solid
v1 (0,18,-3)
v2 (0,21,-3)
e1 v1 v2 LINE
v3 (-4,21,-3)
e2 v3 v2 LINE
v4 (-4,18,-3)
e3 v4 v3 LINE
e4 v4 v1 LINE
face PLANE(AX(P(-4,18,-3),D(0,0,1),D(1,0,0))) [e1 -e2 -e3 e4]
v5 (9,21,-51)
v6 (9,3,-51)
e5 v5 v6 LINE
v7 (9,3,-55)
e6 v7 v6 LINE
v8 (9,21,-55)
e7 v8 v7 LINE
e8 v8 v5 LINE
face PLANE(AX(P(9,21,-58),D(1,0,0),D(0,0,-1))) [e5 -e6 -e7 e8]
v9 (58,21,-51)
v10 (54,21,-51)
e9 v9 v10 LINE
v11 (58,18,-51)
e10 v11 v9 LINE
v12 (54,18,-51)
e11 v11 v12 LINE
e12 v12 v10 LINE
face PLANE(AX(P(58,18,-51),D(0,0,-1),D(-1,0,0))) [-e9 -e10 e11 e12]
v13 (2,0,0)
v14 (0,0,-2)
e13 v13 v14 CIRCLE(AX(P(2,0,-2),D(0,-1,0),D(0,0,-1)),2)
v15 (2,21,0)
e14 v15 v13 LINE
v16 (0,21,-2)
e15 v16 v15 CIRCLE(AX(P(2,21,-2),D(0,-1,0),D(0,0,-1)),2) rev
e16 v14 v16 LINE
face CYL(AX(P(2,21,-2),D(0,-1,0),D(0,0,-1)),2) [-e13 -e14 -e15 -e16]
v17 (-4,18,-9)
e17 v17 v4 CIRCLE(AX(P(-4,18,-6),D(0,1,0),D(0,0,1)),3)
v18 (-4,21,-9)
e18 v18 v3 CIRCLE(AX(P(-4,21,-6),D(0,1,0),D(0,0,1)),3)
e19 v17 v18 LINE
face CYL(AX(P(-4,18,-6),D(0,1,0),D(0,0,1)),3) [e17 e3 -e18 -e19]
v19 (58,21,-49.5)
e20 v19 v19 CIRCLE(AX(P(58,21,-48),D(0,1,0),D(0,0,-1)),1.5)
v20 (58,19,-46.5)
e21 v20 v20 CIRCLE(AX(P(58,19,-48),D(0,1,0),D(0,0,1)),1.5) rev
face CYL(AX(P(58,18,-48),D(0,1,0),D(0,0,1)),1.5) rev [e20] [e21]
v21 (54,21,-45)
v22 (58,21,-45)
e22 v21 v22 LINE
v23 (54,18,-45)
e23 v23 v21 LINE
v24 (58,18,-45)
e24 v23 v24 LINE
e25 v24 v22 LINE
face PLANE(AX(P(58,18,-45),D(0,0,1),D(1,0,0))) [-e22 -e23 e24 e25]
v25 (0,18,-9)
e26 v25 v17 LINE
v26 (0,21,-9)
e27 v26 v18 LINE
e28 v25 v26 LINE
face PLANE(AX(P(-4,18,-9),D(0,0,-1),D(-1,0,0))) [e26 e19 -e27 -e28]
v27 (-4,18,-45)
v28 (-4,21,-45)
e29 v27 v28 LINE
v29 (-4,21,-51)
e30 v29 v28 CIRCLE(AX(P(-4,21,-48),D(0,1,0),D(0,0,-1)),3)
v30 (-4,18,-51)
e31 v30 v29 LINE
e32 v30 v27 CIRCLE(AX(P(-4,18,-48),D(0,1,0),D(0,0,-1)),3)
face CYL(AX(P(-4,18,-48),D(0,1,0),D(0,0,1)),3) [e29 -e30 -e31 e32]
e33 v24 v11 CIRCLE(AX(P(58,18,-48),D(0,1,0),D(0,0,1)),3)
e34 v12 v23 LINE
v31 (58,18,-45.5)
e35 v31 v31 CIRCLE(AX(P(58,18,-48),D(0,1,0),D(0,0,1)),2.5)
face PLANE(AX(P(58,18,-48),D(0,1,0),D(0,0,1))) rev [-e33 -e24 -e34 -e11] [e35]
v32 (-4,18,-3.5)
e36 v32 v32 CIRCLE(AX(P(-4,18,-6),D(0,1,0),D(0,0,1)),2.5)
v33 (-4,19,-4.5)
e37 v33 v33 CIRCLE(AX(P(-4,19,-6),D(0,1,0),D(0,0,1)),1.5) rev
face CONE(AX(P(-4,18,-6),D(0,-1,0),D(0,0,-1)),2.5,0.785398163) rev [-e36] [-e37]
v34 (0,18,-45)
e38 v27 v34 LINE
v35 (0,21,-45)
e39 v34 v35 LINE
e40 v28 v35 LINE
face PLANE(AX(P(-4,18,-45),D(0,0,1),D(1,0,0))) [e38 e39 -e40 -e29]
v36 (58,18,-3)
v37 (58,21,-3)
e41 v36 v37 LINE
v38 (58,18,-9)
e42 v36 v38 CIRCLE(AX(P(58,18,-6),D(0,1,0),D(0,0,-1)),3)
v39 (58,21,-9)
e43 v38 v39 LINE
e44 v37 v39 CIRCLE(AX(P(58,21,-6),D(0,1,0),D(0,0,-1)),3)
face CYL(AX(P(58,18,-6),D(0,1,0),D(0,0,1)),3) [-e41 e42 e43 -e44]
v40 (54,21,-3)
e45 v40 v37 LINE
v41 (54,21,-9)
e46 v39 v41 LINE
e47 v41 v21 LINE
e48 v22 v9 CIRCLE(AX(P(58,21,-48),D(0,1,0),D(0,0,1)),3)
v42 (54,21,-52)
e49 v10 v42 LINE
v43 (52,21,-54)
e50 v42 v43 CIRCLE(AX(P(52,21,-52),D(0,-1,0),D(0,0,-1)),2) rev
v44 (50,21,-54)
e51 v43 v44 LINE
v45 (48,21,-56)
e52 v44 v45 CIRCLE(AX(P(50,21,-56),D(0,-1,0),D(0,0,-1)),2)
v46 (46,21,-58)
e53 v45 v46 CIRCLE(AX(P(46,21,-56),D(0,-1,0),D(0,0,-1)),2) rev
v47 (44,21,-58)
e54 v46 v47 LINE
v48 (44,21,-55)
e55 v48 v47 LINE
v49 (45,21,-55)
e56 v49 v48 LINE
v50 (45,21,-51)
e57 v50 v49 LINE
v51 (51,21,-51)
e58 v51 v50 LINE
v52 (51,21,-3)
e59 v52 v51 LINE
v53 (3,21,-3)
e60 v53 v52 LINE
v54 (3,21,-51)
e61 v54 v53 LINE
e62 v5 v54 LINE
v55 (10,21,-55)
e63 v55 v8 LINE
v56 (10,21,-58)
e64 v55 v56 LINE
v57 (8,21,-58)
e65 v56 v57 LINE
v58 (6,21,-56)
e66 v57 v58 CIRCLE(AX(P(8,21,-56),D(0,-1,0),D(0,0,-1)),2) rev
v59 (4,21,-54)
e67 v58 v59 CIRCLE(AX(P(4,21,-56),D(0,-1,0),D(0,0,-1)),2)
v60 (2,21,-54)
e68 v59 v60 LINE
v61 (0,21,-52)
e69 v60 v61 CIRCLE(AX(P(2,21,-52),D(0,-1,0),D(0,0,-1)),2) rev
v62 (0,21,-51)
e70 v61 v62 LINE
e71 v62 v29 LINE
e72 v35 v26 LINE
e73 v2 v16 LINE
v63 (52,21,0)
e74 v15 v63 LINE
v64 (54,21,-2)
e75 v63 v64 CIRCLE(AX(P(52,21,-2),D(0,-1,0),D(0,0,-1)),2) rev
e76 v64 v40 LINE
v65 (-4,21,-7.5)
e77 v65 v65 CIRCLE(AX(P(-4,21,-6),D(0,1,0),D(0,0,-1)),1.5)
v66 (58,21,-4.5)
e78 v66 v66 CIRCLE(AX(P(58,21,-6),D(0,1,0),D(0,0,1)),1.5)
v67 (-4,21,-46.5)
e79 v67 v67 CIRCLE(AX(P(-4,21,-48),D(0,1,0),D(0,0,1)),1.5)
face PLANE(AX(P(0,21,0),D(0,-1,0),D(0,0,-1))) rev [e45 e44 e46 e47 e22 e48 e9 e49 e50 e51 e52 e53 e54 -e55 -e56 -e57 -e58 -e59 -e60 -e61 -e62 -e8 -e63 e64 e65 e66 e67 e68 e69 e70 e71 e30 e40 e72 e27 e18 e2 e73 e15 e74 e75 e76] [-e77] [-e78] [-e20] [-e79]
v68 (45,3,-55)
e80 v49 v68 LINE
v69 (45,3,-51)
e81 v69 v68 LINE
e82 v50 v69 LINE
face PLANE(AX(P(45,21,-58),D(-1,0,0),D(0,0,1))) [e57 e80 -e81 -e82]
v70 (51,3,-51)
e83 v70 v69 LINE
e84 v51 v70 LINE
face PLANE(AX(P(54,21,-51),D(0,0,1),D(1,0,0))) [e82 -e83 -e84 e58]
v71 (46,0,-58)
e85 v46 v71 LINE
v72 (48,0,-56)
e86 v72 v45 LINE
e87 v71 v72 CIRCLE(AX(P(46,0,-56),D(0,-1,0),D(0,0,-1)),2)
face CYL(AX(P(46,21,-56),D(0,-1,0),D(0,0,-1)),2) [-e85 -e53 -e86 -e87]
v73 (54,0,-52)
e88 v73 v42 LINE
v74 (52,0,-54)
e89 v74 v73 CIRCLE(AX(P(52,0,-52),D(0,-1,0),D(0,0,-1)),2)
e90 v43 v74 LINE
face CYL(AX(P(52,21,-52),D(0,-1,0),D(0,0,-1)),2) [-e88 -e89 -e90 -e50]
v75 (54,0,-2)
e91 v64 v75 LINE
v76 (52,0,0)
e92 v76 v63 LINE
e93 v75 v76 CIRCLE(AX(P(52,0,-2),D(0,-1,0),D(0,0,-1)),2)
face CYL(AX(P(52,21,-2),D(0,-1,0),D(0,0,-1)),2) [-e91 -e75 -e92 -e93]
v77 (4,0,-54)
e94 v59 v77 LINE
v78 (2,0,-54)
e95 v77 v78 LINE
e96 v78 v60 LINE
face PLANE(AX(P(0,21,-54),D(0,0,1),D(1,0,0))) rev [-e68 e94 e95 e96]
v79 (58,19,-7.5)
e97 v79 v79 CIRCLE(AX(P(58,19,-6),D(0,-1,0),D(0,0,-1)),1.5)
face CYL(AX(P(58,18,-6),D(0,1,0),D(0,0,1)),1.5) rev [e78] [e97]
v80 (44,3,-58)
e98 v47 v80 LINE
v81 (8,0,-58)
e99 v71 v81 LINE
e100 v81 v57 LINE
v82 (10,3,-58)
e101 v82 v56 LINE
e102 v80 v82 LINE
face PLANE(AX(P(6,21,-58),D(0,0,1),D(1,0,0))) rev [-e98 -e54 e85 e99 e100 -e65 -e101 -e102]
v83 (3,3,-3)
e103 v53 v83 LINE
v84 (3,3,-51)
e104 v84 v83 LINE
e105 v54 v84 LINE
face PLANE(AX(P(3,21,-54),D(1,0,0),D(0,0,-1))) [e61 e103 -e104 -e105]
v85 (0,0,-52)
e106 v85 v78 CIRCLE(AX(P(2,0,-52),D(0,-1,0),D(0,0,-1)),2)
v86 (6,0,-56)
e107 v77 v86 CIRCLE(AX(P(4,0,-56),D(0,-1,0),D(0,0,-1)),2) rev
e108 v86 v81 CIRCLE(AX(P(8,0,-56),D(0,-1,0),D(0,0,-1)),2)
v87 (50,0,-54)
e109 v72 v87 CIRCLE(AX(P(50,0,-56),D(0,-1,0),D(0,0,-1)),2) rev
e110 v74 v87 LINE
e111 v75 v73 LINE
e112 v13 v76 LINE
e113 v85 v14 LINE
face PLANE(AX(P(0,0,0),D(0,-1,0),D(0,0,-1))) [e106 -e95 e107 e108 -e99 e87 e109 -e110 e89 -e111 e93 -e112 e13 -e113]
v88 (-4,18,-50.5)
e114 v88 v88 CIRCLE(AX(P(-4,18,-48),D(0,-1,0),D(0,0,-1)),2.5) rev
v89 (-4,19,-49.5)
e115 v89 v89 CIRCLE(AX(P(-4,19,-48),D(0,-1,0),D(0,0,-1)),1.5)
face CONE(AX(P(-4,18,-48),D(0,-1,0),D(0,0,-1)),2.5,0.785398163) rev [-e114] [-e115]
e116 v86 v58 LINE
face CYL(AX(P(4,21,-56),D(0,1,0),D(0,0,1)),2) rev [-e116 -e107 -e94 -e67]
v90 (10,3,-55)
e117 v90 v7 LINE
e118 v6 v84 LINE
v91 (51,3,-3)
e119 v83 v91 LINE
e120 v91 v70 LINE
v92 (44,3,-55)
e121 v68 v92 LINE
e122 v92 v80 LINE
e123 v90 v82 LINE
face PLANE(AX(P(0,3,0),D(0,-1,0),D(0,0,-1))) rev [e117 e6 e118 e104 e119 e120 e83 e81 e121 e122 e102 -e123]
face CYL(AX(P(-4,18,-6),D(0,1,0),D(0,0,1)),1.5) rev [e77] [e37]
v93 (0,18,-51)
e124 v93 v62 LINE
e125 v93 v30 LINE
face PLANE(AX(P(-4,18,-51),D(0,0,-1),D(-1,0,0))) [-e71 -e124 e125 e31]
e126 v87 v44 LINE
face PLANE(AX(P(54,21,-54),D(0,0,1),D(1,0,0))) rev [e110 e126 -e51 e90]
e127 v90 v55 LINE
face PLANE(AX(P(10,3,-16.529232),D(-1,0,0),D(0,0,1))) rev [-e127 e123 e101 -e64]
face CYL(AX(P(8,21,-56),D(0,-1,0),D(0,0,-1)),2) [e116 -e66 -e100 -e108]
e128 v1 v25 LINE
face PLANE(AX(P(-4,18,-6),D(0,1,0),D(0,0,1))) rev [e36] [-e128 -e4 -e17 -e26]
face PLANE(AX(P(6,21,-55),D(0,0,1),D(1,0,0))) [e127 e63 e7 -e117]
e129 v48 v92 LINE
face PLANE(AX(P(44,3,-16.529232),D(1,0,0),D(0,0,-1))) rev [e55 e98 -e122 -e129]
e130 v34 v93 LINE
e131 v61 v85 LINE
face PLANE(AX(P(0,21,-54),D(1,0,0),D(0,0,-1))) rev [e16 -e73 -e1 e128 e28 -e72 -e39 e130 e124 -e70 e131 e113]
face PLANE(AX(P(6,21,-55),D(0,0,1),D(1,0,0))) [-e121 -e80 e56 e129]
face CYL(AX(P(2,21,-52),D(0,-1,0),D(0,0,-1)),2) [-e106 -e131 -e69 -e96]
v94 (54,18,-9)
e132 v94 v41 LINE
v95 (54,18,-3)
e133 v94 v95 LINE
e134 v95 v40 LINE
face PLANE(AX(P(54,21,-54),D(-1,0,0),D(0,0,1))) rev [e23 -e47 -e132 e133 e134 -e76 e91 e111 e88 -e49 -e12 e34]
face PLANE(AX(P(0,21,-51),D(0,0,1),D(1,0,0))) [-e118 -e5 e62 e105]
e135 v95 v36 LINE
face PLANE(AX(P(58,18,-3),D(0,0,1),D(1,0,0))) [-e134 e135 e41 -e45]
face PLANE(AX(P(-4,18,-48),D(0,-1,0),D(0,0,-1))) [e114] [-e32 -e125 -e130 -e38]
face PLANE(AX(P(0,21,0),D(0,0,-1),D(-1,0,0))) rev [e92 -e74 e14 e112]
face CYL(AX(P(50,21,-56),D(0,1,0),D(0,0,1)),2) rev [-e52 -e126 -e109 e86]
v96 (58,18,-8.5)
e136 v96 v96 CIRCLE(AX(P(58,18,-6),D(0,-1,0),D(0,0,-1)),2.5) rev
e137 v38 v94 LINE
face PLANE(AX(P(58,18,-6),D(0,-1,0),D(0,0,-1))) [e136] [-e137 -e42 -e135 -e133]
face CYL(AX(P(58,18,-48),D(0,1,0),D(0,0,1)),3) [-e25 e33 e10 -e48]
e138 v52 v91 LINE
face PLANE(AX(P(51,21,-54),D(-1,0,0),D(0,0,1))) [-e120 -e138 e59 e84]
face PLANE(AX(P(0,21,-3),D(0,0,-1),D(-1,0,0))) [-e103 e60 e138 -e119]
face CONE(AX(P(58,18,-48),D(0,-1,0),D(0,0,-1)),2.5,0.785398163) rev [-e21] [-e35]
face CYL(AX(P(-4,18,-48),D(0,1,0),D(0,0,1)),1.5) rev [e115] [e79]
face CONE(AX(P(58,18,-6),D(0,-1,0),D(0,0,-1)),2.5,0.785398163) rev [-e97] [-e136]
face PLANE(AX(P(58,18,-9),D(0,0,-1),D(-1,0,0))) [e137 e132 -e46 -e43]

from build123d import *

# Parameters (mm, degrees)
BOSS_EXTRUDE1_DEPTH = 21
SHELL2_T            = -3
SKETCH2_W           = 34
SKETCH2_H           = 18
CUT_EXTRUDE1_DEPTH  = 3
FILLET2_R           = 2
SKETCH4_R           = 1.5
BOSS_EXTRUDE2_DEPTH = 3
CHAMFER1_SIZE       = 1


with BuildPart() as part:
    # Sketch1 → Boss-Extrude1 (new body)
    with BuildSketch(Plane(origin=(0, 0, 0), x_dir=(1, 0, 0), z_dir=(0, 1, 0))):
        Polygon((0, 54), (0, 0), (54, 0), (54, 54), (48, 54), (48, 58), (6, 58), (6, 54), align=None)
    extrude(amount=BOSS_EXTRUDE1_DEPTH)

    # Shell2
    shell2_openings = [part.faces().sort_by_distance(p)[0] for p in [
        (27, 21, -28.579766537),
    ]]
    offset(amount=SHELL2_T, openings=shell2_openings, kind=Kind.INTERSECTION)

    # Sketch2 → Cut-Extrude1 (cut)
    with BuildSketch(Plane(origin=(0, 0, -58), x_dir=(-1, 0, 0), z_dir=(0, 0, -1))):
        with Locations((-27, 12)):
            Rectangle(SKETCH2_W, SKETCH2_H)
    extrude(amount=-CUT_EXTRUDE1_DEPTH, mode=Mode.SUBTRACT)

    # Fillet2
    fillet2_edges = [part.edges().sort_by_distance(p)[0] for p in [
        (6, 10.5, -58),
        (6, 10.5, -54),
        (0, 10.5, -54),
        (0, 10.5, 0),
        (54, 10.5, 0),
        (48, 10.5, -54),
        (48, 10.5, -58),
        (54, 10.5, -54),
    ]]
    fillet(fillet2_edges, radius=FILLET2_R - 0.0001)  # a hair under: the kernel refuses the full size

    # Sketch4 → Boss-Extrude2 (add)
    # profile 1 of 4: a face of its own
    with BuildSketch(Plane(origin=(0, 21, 0), x_dir=(1, 0, 0), z_dir=(0, 1, 0))):
        with BuildLine():
            Line((0, 51), (0, 45))
            Line((0, 45), (-4, 45))
            ThreePointArc((-4, 45), (-7, 48), (-4, 51))
            Line((-4, 51), (0, 51))
        make_face()
        with Locations(Location((-4, 48, 0), (0, 0, 270))):
            Circle(SKETCH4_R, mode=Mode.SUBTRACT)
    # profile 2 of 4: a face of its own
    with BuildSketch(Plane(origin=(0, 21, 0), x_dir=(1, 0, 0), z_dir=(0, 1, 0))):
        with BuildLine():
            Line((-4, 3), (0, 3))
            Line((0, 3), (0, 9))
            Line((0, 9), (-4, 9))
            ThreePointArc((-4, 9), (-7, 6), (-4, 3))
        make_face()
        with Locations(Location((-4, 6, 0), (0, 0, 90))):
            Circle(SKETCH4_R, mode=Mode.SUBTRACT)
    # profile 3 of 4: a face of its own
    with BuildSketch(Plane(origin=(0, 21, 0), x_dir=(1, 0, 0), z_dir=(0, 1, 0))):
        with BuildLine():
            Line((58, 9), (54, 9))
            Line((54, 9), (54, 3))
            Line((54, 3), (58, 3))
            ThreePointArc((58, 3), (61, 6), (58, 9))
        make_face()
        with Locations(Location((58, 6, 0), (0, 0, 270))):
            Circle(SKETCH4_R, mode=Mode.SUBTRACT)
    # profile 4 of 4: a face of its own
    with BuildSketch(Plane(origin=(0, 21, 0), x_dir=(1, 0, 0), z_dir=(0, 1, 0))):
        with BuildLine():
            Line((58, 51), (54, 51))
            Line((54, 51), (54, 45))
            Line((54, 45), (58, 45))
            ThreePointArc((58, 45), (61, 48), (58, 51))
        make_face()
        with Locations(Location((58, 48, 0), (0, 0, 90))):
            Circle(SKETCH4_R, mode=Mode.SUBTRACT)
    extrude(amount=-BOSS_EXTRUDE2_DEPTH)

    # Chamfer1
    chamfer1_edges = [part.edges().sort_by_distance(p)[0] for p in [
        (-4, 18, -49.5),
        (-4, 18, -4.5),
        (58, 18, -7.5),
        (58, 18, -46.5),
    ]]
    chamfer(chamfer1_edges, length=CHAMFER1_SIZE)


solid = part.part
